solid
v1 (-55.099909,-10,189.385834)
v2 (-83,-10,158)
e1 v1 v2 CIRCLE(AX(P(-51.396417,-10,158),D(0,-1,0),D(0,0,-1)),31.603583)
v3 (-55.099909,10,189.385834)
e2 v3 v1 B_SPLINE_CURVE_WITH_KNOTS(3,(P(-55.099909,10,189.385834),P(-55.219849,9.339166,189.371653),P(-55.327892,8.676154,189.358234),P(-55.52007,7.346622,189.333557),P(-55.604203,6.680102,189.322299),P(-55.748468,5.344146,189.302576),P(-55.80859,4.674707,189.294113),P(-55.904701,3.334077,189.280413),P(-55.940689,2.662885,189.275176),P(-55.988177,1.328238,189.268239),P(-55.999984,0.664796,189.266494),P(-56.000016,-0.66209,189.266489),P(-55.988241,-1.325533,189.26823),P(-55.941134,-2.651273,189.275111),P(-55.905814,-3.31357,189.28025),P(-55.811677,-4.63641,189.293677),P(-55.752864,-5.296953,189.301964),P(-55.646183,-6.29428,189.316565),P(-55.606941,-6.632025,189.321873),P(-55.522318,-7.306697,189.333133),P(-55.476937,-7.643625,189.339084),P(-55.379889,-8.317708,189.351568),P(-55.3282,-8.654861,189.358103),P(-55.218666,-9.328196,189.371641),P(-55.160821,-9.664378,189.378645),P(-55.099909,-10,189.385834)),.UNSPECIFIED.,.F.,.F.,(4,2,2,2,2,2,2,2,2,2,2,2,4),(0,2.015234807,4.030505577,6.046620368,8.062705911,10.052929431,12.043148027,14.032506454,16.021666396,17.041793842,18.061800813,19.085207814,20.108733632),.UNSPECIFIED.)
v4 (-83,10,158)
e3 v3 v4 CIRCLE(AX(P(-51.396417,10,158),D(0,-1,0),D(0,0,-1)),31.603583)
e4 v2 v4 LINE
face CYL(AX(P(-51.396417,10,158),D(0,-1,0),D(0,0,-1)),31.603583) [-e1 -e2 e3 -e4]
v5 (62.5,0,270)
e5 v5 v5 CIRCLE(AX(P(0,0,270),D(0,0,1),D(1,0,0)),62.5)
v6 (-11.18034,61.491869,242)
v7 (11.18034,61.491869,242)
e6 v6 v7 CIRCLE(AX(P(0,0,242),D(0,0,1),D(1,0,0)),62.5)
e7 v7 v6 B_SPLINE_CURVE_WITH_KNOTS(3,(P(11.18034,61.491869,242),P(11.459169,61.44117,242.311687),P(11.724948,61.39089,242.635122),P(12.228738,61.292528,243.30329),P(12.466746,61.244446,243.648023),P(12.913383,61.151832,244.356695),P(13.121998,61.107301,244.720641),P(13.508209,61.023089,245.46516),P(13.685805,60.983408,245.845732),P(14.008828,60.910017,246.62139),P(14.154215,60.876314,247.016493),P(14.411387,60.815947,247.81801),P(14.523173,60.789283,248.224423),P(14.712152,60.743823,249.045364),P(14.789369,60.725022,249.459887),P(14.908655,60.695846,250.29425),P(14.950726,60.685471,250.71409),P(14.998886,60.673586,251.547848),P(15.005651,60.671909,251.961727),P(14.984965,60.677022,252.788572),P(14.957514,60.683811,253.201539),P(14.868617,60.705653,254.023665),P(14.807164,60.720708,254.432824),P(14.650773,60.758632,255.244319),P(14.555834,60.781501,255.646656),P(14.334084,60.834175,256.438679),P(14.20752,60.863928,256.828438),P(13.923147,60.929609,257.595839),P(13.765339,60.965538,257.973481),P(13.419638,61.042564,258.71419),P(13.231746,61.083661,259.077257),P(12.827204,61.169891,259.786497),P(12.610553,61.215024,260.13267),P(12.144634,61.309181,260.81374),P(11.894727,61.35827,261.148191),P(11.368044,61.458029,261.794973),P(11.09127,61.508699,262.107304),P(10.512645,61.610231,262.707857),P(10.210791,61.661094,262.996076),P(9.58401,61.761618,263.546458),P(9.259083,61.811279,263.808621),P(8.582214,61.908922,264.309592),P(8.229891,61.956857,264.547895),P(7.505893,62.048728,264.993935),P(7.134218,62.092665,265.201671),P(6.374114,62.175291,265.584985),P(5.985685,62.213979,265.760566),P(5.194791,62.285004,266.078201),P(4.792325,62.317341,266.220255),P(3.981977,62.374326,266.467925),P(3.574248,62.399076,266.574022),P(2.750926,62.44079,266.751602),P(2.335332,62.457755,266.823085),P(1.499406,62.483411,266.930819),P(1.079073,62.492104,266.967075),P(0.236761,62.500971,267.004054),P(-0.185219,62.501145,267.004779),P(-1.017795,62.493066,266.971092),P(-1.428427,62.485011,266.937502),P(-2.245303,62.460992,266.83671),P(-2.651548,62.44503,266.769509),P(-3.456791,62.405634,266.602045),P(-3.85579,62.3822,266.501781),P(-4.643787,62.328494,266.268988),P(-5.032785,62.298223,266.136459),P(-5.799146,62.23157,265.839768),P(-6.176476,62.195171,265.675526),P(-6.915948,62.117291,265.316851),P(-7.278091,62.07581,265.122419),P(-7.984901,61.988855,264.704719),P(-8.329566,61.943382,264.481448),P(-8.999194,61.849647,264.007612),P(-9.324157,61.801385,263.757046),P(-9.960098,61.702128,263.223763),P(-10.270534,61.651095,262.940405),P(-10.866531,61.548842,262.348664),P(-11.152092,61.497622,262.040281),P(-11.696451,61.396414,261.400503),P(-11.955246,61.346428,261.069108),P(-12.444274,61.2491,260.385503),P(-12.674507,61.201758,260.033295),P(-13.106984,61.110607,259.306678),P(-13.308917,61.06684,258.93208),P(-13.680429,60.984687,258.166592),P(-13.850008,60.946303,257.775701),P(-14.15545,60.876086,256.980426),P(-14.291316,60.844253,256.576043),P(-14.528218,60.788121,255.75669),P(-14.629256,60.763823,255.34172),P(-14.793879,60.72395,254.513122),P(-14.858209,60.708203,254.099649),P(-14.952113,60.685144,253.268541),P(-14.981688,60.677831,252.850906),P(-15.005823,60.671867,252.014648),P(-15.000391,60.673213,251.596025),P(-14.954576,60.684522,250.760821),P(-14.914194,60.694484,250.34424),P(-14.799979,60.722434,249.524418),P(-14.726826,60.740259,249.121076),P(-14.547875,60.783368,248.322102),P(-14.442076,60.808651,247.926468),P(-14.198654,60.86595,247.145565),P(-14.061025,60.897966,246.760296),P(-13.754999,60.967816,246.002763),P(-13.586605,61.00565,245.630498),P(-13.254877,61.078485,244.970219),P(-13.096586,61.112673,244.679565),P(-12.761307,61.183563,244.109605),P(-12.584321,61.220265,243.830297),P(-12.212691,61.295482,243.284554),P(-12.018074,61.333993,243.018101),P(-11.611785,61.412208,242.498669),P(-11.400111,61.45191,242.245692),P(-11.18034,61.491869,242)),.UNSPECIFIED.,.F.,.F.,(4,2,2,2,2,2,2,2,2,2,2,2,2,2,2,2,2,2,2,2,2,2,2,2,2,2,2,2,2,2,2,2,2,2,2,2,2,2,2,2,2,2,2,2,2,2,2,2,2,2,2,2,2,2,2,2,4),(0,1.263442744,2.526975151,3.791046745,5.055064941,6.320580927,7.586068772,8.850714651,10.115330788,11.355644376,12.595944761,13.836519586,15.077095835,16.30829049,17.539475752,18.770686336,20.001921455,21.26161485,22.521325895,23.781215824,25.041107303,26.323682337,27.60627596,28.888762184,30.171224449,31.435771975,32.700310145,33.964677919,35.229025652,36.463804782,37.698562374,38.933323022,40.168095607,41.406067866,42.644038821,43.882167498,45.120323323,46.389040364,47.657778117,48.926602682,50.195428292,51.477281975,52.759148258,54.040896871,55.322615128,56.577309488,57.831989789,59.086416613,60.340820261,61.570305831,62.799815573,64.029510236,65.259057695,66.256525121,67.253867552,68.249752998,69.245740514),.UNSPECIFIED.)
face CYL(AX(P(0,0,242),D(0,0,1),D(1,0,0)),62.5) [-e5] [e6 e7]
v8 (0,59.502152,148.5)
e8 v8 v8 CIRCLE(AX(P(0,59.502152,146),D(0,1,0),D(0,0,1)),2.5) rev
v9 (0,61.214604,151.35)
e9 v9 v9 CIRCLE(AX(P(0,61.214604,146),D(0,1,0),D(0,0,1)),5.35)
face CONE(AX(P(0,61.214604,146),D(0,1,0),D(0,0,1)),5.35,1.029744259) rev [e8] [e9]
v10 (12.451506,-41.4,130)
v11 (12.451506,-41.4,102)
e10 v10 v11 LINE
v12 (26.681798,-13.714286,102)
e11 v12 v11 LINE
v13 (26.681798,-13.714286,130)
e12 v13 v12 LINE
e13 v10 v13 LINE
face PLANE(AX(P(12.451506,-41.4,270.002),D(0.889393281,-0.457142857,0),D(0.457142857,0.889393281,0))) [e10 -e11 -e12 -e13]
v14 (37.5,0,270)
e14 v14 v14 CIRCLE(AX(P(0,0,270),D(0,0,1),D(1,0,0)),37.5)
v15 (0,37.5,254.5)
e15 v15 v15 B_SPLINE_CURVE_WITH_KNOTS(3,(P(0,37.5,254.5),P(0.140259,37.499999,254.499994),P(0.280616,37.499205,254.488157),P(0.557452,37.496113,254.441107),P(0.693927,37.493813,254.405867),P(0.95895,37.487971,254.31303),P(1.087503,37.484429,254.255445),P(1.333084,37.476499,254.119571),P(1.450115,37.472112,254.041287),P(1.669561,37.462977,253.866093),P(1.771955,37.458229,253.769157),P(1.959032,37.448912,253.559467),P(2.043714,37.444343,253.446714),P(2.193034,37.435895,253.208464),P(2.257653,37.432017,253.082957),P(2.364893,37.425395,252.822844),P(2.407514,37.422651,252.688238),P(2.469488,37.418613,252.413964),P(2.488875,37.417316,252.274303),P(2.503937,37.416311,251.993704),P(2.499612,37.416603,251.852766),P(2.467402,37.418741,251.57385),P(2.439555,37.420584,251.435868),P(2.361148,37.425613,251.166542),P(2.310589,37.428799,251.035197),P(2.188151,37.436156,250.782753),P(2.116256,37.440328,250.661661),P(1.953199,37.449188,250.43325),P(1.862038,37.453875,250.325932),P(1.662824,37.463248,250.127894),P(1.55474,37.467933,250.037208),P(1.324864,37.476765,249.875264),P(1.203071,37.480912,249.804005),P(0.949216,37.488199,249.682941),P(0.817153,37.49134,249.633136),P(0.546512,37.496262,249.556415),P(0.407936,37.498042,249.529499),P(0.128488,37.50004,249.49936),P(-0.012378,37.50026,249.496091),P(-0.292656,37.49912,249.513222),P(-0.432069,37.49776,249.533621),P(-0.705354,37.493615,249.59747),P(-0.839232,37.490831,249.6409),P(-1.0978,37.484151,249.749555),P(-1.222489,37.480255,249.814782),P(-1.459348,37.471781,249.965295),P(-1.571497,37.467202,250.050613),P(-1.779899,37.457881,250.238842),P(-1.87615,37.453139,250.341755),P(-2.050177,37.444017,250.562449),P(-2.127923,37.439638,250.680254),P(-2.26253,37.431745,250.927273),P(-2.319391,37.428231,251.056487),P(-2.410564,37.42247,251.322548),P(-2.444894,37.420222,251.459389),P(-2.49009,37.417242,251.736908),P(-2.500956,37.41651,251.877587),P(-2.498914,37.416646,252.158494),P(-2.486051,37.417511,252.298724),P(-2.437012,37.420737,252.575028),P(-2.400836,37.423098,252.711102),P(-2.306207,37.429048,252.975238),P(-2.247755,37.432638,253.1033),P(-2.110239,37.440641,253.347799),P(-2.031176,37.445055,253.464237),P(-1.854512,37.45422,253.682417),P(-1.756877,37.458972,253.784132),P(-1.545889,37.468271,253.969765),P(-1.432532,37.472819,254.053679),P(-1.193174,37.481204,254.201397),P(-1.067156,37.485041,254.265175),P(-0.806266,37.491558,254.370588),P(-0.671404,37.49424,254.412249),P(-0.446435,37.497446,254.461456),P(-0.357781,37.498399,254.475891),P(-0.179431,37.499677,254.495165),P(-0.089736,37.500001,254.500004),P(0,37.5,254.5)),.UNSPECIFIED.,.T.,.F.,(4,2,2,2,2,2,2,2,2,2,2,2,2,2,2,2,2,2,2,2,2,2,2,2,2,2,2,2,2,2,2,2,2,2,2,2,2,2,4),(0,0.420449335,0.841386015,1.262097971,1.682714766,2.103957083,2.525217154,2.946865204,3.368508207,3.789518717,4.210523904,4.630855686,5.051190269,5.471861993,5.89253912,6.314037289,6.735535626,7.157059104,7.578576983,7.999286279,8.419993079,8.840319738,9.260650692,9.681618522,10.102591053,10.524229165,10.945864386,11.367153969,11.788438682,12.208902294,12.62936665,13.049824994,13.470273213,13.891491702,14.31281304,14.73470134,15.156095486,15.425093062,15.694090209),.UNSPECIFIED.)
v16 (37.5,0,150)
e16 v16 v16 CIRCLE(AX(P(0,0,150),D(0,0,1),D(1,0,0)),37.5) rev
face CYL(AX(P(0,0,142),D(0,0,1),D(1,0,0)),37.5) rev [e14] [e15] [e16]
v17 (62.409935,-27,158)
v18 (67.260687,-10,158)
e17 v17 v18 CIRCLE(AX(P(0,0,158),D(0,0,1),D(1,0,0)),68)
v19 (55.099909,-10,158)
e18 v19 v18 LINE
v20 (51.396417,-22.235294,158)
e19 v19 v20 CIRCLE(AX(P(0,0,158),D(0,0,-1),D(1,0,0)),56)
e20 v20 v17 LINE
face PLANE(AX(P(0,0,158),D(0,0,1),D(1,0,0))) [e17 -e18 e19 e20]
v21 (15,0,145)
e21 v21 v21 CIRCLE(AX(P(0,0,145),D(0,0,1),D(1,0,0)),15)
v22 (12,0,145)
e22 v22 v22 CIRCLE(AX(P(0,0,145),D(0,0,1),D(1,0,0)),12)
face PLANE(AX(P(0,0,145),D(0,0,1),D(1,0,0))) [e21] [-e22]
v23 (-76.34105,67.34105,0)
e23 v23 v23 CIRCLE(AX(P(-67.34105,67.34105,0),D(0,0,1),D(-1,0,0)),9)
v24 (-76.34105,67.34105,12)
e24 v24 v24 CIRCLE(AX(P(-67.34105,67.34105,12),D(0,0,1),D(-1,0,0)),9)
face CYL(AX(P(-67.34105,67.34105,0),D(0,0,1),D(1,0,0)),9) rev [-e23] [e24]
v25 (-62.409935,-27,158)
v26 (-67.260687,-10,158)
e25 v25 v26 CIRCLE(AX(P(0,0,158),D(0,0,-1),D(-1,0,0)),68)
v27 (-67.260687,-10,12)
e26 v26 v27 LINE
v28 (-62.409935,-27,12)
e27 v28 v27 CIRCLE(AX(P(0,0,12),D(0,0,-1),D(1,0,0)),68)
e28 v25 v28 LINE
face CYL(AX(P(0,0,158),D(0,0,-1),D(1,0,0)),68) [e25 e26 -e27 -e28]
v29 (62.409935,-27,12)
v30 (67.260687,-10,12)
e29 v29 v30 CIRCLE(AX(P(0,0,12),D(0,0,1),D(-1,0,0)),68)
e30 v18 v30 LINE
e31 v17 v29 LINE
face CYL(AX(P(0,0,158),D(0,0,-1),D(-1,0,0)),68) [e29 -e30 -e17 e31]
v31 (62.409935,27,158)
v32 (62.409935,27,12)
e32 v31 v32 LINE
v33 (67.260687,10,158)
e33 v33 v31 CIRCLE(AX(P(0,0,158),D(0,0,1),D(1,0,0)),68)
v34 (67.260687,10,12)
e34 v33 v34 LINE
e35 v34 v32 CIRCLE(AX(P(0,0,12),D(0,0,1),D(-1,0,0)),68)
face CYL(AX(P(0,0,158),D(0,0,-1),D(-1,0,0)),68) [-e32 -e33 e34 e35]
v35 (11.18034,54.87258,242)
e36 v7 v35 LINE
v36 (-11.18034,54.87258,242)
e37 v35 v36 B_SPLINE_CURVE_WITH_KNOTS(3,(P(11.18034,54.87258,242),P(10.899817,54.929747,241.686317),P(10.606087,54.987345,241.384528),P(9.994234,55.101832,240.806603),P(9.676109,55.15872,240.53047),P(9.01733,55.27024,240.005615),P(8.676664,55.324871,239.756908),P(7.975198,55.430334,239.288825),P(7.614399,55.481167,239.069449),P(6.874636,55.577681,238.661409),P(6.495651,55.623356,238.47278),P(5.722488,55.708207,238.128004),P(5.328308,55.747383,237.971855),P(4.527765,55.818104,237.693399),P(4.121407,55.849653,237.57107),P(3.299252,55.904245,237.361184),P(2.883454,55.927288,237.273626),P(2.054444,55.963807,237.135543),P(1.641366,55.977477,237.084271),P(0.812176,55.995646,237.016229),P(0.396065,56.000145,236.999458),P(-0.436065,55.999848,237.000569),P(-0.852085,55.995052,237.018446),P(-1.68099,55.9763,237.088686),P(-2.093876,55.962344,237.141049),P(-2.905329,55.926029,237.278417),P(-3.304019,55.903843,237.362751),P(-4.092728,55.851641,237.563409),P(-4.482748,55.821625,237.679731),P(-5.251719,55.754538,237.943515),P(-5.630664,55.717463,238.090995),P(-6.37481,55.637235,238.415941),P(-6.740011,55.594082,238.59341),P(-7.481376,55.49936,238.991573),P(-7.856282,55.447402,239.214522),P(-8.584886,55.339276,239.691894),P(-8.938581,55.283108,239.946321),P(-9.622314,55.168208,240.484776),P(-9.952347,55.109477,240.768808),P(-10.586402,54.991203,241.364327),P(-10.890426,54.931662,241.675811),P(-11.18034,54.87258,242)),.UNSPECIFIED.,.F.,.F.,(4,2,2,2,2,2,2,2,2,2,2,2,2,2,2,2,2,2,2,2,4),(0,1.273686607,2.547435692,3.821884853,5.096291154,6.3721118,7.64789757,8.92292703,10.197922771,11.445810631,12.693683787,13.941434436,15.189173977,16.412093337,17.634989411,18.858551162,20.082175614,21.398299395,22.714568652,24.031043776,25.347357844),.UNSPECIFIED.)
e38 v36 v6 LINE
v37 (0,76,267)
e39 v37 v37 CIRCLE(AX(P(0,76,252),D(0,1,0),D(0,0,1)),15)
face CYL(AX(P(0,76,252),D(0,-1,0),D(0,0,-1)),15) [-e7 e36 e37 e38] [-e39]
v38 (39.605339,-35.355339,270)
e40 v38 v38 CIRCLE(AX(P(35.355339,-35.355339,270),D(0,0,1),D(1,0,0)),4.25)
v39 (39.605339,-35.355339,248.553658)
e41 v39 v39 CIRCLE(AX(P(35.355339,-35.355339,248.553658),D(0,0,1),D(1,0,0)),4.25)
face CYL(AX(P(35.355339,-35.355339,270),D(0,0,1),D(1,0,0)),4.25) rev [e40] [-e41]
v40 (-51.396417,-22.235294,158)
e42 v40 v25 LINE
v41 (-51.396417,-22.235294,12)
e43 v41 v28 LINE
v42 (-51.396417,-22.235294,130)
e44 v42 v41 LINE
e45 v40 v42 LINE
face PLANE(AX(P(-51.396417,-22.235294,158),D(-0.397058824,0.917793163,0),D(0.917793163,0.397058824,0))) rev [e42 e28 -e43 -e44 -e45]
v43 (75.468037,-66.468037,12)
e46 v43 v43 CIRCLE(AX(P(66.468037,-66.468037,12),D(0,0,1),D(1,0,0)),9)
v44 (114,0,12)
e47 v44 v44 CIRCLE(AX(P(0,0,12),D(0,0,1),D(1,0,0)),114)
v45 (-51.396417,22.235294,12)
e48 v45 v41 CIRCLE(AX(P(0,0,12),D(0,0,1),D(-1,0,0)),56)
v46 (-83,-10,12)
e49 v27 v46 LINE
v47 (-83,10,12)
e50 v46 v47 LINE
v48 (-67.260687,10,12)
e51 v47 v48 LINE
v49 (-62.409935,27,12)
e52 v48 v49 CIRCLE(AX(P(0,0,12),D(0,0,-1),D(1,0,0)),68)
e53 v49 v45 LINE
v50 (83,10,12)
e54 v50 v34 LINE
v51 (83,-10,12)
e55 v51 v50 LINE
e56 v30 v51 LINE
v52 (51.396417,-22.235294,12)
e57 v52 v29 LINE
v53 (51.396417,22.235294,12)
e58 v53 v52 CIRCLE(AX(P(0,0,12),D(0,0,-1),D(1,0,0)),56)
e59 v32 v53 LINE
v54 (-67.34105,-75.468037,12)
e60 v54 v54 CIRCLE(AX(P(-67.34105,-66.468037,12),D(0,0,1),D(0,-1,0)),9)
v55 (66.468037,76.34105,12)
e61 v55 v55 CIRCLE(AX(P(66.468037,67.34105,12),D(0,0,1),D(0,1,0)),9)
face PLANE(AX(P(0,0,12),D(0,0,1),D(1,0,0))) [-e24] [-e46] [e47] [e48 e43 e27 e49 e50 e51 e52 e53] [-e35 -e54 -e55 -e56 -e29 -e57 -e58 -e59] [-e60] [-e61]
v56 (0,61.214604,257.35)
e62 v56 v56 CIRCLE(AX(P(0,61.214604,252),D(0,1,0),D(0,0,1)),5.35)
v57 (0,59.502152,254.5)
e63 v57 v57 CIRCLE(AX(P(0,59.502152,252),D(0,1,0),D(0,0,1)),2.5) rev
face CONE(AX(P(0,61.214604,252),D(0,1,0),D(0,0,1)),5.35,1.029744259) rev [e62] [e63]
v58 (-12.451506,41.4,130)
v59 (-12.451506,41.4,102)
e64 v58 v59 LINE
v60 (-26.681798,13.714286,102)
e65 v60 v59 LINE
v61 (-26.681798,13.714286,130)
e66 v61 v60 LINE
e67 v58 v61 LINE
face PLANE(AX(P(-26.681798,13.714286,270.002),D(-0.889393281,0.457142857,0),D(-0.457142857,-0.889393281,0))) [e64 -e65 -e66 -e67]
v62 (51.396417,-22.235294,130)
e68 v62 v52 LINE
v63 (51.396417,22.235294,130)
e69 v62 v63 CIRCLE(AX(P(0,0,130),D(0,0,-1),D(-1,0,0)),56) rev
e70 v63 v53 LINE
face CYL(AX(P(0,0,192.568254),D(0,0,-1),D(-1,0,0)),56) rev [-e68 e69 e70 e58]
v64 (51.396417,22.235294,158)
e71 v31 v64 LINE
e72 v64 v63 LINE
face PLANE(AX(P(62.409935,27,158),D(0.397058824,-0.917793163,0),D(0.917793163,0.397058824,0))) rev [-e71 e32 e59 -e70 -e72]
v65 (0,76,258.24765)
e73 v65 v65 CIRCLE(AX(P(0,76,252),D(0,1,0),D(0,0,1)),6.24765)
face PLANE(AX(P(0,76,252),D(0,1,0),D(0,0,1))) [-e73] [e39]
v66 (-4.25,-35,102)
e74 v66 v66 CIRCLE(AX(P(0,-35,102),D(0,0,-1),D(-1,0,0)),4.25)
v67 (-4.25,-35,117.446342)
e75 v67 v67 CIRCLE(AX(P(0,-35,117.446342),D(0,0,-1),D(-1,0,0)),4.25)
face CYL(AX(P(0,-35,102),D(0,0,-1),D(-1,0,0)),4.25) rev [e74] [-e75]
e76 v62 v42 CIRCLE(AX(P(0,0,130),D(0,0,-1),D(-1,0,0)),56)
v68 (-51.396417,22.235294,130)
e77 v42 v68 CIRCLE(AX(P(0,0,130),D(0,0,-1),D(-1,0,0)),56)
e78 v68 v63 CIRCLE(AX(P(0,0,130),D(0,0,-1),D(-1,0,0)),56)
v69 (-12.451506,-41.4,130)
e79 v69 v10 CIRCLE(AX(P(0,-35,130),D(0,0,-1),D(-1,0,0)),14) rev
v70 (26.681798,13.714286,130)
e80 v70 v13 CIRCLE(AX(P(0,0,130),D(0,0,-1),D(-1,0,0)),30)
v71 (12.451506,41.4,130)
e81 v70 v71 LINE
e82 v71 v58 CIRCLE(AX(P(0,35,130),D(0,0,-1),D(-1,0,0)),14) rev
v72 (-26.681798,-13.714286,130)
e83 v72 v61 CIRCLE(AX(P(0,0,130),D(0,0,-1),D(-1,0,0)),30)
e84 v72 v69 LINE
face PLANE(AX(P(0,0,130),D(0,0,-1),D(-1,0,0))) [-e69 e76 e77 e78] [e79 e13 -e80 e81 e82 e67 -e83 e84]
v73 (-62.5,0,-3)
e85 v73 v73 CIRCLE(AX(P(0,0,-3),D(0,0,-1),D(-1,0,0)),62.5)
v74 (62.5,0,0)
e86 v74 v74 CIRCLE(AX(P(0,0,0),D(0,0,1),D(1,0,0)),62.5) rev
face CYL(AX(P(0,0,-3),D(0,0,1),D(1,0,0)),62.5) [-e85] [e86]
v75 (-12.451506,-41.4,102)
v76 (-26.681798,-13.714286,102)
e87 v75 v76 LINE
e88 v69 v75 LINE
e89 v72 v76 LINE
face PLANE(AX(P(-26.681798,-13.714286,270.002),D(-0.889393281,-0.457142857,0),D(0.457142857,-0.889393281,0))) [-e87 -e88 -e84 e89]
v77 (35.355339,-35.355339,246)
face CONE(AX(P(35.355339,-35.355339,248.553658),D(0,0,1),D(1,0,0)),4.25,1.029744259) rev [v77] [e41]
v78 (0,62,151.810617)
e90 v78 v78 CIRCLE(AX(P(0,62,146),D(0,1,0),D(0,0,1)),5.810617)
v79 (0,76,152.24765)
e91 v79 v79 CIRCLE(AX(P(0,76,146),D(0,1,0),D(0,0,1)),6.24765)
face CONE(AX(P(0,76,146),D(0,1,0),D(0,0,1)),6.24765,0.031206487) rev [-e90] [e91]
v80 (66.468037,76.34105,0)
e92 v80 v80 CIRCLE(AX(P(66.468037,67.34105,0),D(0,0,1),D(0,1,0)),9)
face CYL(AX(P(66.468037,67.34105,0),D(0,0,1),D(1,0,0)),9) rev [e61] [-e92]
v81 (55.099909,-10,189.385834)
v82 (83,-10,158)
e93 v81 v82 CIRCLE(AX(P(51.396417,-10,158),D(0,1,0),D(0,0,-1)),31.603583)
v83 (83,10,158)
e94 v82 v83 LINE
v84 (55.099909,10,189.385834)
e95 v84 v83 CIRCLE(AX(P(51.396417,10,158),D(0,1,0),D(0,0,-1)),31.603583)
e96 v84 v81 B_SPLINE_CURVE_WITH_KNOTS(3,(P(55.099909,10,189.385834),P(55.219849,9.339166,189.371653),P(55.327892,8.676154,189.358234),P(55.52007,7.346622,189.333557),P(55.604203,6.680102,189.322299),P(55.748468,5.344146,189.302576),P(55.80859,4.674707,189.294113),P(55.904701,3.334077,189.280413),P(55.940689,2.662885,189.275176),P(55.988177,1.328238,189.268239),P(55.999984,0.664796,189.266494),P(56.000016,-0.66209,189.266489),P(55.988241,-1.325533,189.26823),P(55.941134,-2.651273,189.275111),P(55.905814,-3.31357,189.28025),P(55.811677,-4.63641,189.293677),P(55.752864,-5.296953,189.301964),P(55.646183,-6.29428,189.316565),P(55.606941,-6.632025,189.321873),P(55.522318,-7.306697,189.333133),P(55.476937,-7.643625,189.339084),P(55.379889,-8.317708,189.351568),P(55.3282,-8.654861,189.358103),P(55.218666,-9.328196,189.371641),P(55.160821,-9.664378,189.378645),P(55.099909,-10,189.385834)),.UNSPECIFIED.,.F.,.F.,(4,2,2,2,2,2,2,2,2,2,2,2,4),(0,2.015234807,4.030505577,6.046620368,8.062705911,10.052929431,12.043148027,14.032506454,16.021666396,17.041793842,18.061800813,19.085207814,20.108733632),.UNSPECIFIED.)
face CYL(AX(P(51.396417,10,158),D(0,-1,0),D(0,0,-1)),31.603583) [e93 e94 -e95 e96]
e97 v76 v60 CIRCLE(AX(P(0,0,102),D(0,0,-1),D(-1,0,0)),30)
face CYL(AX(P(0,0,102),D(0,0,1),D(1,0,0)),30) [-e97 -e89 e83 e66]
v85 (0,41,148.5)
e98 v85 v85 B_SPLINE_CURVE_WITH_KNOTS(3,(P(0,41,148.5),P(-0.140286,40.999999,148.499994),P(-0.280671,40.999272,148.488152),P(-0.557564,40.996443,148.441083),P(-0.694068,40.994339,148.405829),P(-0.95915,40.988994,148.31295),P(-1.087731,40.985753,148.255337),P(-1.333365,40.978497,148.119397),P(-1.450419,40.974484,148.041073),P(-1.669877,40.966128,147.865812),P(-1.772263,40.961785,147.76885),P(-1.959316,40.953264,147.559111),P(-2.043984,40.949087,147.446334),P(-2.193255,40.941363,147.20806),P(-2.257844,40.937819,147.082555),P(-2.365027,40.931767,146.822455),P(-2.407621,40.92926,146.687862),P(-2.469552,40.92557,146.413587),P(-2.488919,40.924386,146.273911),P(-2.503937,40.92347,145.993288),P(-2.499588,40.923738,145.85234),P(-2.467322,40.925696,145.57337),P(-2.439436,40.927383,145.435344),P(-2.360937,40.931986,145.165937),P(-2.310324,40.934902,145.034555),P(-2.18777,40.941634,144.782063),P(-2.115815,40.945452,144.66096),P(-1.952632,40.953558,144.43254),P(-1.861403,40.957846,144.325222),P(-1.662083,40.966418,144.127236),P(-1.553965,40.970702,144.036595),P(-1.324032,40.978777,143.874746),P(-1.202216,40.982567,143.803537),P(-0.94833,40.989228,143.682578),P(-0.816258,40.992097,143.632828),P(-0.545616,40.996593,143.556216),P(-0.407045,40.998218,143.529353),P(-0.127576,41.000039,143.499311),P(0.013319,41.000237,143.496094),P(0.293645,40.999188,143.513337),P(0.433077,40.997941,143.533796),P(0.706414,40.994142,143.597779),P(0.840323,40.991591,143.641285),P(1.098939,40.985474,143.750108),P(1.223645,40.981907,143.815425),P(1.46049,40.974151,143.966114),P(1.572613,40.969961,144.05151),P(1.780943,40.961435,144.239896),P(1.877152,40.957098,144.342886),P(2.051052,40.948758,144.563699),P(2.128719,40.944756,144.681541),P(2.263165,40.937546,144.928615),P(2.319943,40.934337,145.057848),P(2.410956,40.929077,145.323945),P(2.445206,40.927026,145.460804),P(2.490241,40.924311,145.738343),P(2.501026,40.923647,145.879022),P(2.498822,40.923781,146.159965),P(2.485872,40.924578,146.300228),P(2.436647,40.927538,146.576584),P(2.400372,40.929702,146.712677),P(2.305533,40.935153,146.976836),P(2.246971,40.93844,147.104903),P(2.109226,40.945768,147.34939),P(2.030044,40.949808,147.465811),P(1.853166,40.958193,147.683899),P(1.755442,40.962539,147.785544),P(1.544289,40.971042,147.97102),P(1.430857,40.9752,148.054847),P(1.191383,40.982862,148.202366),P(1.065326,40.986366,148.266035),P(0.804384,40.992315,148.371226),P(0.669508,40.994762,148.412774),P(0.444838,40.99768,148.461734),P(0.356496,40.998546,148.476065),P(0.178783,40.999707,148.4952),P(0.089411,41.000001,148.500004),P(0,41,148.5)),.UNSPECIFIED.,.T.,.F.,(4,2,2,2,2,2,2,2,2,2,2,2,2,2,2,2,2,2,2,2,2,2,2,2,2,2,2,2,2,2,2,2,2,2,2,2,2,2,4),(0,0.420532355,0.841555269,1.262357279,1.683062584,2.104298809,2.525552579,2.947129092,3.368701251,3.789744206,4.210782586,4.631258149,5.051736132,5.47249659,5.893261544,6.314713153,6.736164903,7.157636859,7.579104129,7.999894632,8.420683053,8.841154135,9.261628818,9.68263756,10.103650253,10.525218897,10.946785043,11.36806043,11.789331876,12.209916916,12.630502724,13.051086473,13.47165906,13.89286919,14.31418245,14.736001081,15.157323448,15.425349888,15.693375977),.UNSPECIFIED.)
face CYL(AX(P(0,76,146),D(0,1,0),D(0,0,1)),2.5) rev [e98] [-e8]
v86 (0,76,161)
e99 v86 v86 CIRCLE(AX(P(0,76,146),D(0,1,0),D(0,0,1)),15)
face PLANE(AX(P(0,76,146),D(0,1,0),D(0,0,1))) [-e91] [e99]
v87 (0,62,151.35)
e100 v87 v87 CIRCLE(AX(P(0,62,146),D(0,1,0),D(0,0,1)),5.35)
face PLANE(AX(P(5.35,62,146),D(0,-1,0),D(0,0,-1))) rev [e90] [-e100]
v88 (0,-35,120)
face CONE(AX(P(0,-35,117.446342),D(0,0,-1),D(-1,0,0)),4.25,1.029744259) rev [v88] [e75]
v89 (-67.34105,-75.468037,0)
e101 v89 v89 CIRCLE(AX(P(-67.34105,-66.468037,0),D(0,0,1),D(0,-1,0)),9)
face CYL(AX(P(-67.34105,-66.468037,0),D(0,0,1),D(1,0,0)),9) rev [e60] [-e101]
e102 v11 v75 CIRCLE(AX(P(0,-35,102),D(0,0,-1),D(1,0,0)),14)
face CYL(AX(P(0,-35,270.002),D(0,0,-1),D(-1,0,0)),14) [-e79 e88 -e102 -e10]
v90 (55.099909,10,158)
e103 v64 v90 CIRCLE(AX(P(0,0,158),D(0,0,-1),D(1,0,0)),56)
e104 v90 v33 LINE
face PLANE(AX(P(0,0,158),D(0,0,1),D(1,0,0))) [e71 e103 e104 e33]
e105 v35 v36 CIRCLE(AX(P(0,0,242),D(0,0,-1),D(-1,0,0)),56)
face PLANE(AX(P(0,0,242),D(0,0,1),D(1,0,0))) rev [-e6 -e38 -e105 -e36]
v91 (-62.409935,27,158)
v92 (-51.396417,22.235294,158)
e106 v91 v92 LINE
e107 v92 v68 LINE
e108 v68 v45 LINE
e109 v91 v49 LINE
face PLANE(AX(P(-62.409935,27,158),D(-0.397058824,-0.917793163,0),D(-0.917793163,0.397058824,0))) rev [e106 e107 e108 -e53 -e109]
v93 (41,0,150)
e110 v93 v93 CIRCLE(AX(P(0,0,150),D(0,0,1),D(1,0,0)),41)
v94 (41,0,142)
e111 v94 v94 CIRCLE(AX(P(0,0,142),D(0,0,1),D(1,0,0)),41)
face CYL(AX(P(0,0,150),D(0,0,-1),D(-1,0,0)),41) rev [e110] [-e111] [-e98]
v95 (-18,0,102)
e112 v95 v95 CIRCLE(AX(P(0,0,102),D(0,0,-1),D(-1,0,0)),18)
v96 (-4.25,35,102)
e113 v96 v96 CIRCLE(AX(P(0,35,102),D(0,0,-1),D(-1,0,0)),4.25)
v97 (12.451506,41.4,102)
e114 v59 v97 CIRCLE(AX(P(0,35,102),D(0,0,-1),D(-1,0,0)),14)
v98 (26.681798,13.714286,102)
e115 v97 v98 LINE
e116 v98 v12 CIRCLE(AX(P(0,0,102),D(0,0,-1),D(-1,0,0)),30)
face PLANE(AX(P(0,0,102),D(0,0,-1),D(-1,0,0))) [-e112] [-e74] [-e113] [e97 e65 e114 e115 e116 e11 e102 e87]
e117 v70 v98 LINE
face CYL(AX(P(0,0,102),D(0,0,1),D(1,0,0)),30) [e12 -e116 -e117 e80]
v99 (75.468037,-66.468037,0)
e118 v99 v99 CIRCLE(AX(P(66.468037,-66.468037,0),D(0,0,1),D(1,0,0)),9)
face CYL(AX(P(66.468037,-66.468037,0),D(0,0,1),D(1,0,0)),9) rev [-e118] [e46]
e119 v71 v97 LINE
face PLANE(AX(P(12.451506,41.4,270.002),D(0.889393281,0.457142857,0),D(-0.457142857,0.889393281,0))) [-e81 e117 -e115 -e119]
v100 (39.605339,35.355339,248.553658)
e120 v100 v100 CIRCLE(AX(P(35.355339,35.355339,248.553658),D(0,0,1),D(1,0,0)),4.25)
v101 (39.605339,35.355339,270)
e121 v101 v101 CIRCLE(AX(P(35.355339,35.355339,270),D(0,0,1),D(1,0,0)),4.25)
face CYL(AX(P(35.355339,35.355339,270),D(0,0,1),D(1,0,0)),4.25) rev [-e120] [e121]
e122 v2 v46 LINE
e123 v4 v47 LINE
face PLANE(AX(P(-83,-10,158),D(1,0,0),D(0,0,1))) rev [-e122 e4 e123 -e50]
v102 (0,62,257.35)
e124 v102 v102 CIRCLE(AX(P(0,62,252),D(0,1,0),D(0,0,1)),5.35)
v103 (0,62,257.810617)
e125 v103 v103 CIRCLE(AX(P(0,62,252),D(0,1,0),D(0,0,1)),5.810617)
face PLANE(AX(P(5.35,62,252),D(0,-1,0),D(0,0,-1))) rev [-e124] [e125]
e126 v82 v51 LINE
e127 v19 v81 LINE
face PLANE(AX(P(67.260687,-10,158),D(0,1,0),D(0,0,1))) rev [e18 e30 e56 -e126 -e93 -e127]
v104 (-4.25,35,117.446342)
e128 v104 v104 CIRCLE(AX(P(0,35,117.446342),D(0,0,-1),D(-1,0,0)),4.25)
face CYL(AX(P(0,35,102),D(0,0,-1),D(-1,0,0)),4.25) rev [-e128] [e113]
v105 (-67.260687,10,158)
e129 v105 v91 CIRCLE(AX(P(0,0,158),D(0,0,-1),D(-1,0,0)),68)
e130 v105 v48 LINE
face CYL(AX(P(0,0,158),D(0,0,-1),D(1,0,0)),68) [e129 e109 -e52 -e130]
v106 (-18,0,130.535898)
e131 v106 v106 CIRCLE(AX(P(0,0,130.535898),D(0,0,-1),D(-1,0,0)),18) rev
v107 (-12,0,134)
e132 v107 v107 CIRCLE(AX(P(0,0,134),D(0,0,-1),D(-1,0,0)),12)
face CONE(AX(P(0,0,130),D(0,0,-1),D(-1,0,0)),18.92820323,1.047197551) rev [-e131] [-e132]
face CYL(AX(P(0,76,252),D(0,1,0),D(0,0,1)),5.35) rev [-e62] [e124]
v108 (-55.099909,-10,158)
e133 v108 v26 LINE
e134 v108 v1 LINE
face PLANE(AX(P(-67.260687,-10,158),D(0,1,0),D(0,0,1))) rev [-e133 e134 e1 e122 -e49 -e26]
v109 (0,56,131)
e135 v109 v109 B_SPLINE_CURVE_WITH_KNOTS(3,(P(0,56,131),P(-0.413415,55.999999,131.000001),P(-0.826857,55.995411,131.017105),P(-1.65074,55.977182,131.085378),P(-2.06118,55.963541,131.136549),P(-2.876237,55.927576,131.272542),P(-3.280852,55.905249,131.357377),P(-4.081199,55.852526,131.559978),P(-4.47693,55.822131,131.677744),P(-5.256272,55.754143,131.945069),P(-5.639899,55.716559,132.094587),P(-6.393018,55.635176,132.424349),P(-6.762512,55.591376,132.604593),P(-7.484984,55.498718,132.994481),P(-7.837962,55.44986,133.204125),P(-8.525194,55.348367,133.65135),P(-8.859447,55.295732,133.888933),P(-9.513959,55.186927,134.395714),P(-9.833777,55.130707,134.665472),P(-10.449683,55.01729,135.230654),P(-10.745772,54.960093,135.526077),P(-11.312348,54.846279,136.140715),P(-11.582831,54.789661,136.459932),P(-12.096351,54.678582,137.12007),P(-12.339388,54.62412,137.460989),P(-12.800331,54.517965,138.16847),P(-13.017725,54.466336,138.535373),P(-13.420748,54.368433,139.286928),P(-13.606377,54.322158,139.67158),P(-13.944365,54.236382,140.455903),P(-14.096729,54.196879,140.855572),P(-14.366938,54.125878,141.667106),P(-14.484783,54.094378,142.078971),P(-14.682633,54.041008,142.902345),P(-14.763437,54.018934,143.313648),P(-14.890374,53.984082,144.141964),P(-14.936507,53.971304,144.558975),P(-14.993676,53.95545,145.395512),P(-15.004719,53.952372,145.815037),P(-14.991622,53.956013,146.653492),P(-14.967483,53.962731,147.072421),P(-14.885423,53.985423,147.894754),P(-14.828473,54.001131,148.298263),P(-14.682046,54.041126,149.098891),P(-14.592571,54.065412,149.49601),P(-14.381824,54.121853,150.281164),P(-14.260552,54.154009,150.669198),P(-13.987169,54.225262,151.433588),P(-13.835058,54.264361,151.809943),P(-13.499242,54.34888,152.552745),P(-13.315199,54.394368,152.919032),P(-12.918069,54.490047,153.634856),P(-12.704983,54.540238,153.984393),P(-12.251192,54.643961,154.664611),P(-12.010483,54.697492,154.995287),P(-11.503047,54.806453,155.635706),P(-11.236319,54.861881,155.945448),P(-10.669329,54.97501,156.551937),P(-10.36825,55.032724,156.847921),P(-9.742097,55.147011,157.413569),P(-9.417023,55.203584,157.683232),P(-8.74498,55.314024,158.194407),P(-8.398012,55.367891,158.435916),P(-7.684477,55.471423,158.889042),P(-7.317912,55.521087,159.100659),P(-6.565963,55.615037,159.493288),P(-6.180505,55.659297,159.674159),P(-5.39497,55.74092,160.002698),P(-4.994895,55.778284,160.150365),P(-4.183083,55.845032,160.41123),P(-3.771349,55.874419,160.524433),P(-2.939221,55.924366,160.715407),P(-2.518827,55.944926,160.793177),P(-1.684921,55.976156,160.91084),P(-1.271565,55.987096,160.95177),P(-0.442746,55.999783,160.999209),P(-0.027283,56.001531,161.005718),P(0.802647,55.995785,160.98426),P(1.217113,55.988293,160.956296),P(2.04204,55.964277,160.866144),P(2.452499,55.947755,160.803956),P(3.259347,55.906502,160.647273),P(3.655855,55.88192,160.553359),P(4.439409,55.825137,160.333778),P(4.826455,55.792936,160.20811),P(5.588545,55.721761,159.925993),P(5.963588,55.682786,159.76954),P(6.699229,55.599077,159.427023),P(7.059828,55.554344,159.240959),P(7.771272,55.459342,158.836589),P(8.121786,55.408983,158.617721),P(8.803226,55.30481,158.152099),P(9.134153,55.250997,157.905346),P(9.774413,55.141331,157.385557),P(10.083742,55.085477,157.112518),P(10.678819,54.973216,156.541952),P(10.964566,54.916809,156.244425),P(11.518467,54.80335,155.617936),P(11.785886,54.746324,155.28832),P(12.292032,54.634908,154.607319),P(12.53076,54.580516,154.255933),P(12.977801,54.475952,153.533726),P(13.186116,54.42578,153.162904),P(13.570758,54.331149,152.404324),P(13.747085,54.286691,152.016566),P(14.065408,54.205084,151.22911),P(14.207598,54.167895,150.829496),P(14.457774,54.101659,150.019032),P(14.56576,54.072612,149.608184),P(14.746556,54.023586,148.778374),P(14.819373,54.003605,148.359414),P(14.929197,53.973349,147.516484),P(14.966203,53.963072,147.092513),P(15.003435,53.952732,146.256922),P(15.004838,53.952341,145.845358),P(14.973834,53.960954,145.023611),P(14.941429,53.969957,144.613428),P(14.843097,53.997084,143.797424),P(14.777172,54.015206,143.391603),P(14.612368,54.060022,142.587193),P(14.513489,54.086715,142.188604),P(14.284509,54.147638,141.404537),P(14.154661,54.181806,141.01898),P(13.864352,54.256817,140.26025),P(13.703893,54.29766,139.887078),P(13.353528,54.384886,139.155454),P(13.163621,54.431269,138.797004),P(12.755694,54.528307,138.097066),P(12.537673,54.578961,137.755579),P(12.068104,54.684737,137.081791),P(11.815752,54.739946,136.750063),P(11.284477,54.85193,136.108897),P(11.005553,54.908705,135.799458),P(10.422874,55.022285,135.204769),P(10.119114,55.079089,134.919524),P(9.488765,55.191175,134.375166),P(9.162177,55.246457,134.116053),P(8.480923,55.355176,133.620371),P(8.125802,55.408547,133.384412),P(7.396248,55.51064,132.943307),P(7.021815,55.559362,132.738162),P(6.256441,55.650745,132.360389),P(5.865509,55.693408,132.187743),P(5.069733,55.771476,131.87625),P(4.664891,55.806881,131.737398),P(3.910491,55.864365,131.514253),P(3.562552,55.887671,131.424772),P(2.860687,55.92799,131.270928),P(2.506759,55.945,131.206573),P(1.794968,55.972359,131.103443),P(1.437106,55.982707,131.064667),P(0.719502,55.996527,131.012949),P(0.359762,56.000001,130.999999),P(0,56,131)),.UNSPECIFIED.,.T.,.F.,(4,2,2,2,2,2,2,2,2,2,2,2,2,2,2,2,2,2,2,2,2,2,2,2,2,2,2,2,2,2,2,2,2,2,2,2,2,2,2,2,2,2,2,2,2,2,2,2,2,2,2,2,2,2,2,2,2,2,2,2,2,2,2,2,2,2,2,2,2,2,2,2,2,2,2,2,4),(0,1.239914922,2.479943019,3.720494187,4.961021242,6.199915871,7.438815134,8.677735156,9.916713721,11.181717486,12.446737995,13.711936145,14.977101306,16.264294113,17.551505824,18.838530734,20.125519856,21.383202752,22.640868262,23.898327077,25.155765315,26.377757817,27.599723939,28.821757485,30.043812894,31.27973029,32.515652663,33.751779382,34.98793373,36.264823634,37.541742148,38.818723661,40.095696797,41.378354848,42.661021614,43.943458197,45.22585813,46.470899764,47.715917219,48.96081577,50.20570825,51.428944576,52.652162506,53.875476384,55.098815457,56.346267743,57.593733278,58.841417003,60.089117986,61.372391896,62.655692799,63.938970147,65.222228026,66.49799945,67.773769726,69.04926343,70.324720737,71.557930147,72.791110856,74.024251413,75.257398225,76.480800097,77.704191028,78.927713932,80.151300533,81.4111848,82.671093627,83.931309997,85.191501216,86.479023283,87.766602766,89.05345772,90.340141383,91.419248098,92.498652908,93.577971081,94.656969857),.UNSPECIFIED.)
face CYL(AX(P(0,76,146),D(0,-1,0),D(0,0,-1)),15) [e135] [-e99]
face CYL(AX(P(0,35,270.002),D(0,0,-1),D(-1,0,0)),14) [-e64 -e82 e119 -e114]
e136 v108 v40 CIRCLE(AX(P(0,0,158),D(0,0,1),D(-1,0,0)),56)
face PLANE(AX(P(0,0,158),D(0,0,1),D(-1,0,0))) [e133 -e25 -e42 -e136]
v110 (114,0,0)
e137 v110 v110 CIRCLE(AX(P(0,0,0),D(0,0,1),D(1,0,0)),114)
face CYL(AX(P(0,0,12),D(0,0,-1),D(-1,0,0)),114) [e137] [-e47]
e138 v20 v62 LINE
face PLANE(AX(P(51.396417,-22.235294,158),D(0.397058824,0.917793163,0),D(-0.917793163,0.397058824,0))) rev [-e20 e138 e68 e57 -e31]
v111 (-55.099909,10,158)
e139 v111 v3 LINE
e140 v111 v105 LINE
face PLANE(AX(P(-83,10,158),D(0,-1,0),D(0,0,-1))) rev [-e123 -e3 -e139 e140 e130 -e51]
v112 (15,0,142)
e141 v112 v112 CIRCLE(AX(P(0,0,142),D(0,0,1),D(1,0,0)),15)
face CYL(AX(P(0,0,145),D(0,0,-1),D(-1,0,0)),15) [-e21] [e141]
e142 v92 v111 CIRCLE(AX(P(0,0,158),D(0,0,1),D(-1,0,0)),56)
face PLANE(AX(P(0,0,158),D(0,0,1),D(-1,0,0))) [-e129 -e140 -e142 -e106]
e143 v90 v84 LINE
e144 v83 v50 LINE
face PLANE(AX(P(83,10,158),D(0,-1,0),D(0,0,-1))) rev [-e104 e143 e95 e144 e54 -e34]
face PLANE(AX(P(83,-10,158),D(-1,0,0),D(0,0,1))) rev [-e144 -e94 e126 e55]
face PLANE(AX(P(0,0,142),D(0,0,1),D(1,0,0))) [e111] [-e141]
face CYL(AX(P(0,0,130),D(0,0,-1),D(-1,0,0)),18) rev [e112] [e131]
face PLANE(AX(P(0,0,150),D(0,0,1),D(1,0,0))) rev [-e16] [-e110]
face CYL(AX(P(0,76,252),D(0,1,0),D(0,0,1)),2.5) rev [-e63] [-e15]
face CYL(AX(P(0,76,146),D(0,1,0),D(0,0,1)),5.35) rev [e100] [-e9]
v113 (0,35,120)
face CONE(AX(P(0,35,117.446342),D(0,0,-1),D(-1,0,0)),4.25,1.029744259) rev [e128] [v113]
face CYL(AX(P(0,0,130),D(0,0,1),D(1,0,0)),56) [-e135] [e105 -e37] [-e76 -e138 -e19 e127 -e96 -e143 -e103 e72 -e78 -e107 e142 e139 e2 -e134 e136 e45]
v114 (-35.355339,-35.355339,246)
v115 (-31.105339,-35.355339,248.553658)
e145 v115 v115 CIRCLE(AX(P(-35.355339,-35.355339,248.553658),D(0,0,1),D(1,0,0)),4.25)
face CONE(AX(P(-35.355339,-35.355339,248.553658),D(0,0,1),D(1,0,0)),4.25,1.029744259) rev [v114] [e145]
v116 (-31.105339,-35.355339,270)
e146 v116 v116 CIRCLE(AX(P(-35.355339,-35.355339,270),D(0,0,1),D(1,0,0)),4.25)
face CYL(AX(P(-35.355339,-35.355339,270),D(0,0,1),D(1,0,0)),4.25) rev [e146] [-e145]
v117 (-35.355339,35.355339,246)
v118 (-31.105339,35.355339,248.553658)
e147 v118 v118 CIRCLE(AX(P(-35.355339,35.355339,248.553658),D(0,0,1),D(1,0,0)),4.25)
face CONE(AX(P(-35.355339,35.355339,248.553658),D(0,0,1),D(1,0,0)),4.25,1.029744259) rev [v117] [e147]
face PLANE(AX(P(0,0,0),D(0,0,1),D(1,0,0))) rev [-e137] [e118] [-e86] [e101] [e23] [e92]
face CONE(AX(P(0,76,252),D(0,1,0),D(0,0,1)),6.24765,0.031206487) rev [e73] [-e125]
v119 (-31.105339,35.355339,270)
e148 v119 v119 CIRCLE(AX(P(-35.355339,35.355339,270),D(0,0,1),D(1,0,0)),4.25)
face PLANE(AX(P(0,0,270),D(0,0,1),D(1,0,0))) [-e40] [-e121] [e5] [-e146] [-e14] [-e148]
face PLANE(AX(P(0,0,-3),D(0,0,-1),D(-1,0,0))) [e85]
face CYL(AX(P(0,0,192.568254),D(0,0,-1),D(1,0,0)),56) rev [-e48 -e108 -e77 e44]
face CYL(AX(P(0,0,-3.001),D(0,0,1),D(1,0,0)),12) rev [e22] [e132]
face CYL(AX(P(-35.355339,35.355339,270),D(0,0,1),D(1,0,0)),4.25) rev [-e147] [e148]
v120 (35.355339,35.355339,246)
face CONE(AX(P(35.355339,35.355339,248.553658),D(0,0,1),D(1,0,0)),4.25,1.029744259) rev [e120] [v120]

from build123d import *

# Parameters (mm, degrees)
SKETCH_1_R               = 114
EXTRUDE_1_DEPTH          = 12
EXTRUDE_START            = 258
SKETCH_2_R               = 62.5
EXTRUDE_2_DEPTH          = 28
SKETCH_3_R               = 56
EXTRUDE_3_DEPTH          = 112
SKETCH_4_R               = 30
EXTRUDE_4_DEPTH          = 28
EXTRUDE_5_REACH          = 234.843
EXTRUDE_6_DEPTH          = 118
EXTRUDE_18_DEPTH         = 28
EXTRUDE_19_DEPTH         = 10
SKETCH_12_R              = 15
EXTRUDE_20_DEPTH         = 76
SKETCH_13_R              = 15
EXTRUDE_21_DEPTH         = 76
SKETCH_14_R              = 9
CUT_EXTRUDE_1_DEPTH      = 305.230176103
PATTERN_CIRCULAR_1_COUNT = 4
SKETCH_15_R              = 62.5
EXTRUDE_22_DEPTH         = 3
SKETCH_16_R              = 37.5
CUT_EXTRUDE_2_DEPTH      = 128
PATTERN_CIRCULAR_2_COUNT = 4
SKETCH_19_R              = 41
CUT_EXTRUDE_3_DEPTH      = 8
SKETCH_20_R              = 15
EXTRUDE_23_DEPTH         = 3
CUT_EXTRUDE_4_REACH      = 220.852
SKETCH_21_R              = 12
SKETCH_22_R              = 18
CUT_EXTRUDE_5_DEPTH      = 28
CHAMFER_1_SIZE           = 6.92820323
CHAMFER_1_SIZE_2         = 4
F_1_4_RC_1_AT_2_COUNT    = 2
F_1_4_RC_1_AT_2_PITCH    = 106
F_5_0MM_START            = 11.779218889
F_5_0MM_1_OUTLINE_R      = 2.5
F_5_0MM_1_DEPTH          = 47.722932759
SKETCH_26_R              = 15
SKETCH_26_R_2            = 12
EXTRUDE_24_DEPTH         = 3


# Read off the part's stored shape, not the designer's step: Ø5.0mm 暗销孔1, M10 螺纹孔2
with BuildPart() as part:
    # 草图1 → 凸台-拉伸1 (new body)
    with BuildSketch(Plane.XY):
        Circle(SKETCH_1_R)
    extrude(amount=EXTRUDE_1_DEPTH)

    # 草图6 → 凸台-拉伸6 (add)
    with BuildSketch(Plane.XY.offset(12)):
        with BuildLine():
            Line((51.396417147, 22.235294118), (62.409935107, 27))
            ThreePointArc((62.409935107, 27), (65.390118151, 18.658307753), (67.260686883, 10))
            Line((67.260686883, 10), (83, 10))
            Line((83, 10), (83, -10))
            Line((83, -10), (67.260686883, -10))
            ThreePointArc((67.260686883, -10), (65.390118151, -18.658307753), (62.409935107, -27))
            Line((62.409935107, -27), (51.396417147, -22.235294118))
            ThreePointArc((51.396417147, -22.235294118), (56, 0), (51.396417147, 22.235294118))
        make_face()
    extrude_6 = extrude(amount=EXTRUDE_6_DEPTH)



with BuildPart() as body_2:
    # 草图2 → 凸台-拉伸2 (new body)
    with BuildSketch(Plane.XY.offset(12).offset(EXTRUDE_START)):
        Circle(SKETCH_2_R)
    extrude(amount=-EXTRUDE_2_DEPTH)

    # 草图3 → 凸台-拉伸3 (add)
    with BuildSketch(Plane(origin=(0, 0, 242), x_dir=(-1, 0, 0), z_dir=(0, 0, -1))):
        Circle(SKETCH_3_R)
    extrude(amount=EXTRUDE_3_DEPTH)

    # 草图4 → 凸台-拉伸4 (add)
    with BuildSketch(Plane(origin=(0, 0, 130), x_dir=(-1, 0, 0), z_dir=(0, 0, -1))):
        Circle(SKETCH_4_R)
    extrude(amount=EXTRUDE_4_DEPTH)

    # 草图5 → 凸台-拉伸5 (add, up to next)
    with BuildSketch(Plane(origin=(0, 0, 102), x_dir=(-1, 0, 0), z_dir=(0, 0, -1)), mode=Mode.PRIVATE) as extrude_5_sk1:
        with BuildLine():
            ThreePointArc((-26.681798428, 13.714285714), (0, 30), (26.681798428, 13.714285714))
            Line((26.681798428, 13.714285714), (12.451505933, 41.4))
            ThreePointArc((12.451505933, 41.4), (0, 49), (-12.451505933, 41.4))
            Line((-12.451505933, 41.4), (-26.681798428, 13.714285714))
        make_face()
    extrude_5_tool1 = extrude(extrude_5_sk1.sketch, amount=-EXTRUDE_5_REACH, mode=Mode.PRIVATE) - body_2.part
    # 草图5 → 凸台-拉伸5 (add, up to next)
    with BuildSketch(Plane(origin=(0, 0, 102), x_dir=(-1, 0, 0), z_dir=(0, 0, -1)), mode=Mode.PRIVATE) as extrude_5_sk2:
        with BuildLine():
            Line((12.451505933, -41.4), (26.681798428, -13.714285714))
            ThreePointArc((26.681798428, -13.714285714), (0, -30), (-26.681798428, -13.714285714))
            Line((-26.681798428, -13.714285714), (-12.451505933, -41.4))
            ThreePointArc((-12.451505933, -41.4), (0, -49), (12.451505933, -41.4))
        make_face()
    extrude_5_tool2 = extrude(extrude_5_sk2.sketch, amount=-EXTRUDE_5_REACH, mode=Mode.PRIVATE) - body_2.part
    add(extrude_5_tool1.solids().sort_by_distance((0, 35.767419, 102))[0])
    add(extrude_5_tool2.solids().sort_by_distance((0, -35.767419, 102))[0])


with BuildPart() as part_1:
    add(part.part)

    add(body_2.part)  # 凸台-拉伸18 merges body 2
    # 草图10 → 凸台-拉伸18 (add)
    with BuildSketch(Plane.XY.offset(130)):
        with BuildLine():
            Line((51.396417147, -22.235294118), (62.409935107, -27))
            ThreePointArc((62.409935107, -27), (65.390118151, -18.658307753), (67.260686883, -10))
            Line((67.260686883, -10), (83, -10))
            Line((83, -10), (83, 10))
            Line((83, 10), (67.260686883, 10))
            ThreePointArc((67.260686883, 10), (65.390118151, 18.658307753), (62.409935107, 27))
            Line((62.409935107, 27), (51.396417147, 22.235294118))
            ThreePointArc((51.396417147, 22.235294118), (56, 0), (51.396417147, -22.235294118))
        make_face()
    extrude_18 = extrude(amount=EXTRUDE_18_DEPTH)

    # 草图11 → 凸台-拉伸19 (add, symmetric)
    with BuildSketch(Plane(origin=(0, 0, 0), x_dir=(1, 0, 0), z_dir=(0, 1, 0))):
        with BuildLine():
            Line((51.396417147, -189.603582853), (51.396417147, -158))
            Line((51.396417147, -158), (83, -158))
            ThreePointArc((83, -158), (73.743524892, -180.347107745), (51.396417147, -189.603582853))
        make_face()
    extrude_19 = extrude(amount=EXTRUDE_19_DEPTH, both=True)

    # 镜向4: 凸台-拉伸6, 凸台-拉伸18, 凸台-拉伸19 across plane
    add(extrude_6.mirror(Plane(origin=(0, 0, 0), x_dir=(0, 0, 1), z_dir=(1, 0, 0))))
    add(extrude_18.mirror(Plane(origin=(0, 0, 0), x_dir=(0, 0, 1), z_dir=(1, 0, 0))))
    add(extrude_19.mirror(Plane(origin=(0, 0, 0), x_dir=(0, 0, 1), z_dir=(1, 0, 0))))

    # 草图12 → 凸台-拉伸20 (add)
    with BuildSketch(Plane(origin=(0, 0, 0), x_dir=(1, 0, 0), z_dir=(0, 1, 0))):
        with Locations(Location((0, -252, 0), (0, 0, 138.189685104))):
            Circle(SKETCH_12_R)
    extrude(amount=EXTRUDE_20_DEPTH)

    # 草图13 → 凸台-拉伸21 (add)
    with BuildSketch(Plane(origin=(0, 0, 0), x_dir=(1, 0, 0), z_dir=(0, 1, 0))):
        with Locations(Location((0, -146, 0), (0, 0, 90))):
            Circle(SKETCH_13_R)
    extrude(amount=EXTRUDE_21_DEPTH)

    # 草图14 → 切除-拉伸1 (cut, through all)
    with BuildSketch(Plane.XY.offset(12)):
        with Locations((66.468037432, -66.468037432)):
            Circle(SKETCH_14_R)
    cut_extrude_1 = extrude(amount=-CUT_EXTRUDE_1_DEPTH, mode=Mode.SUBTRACT)

    # 阵列(圆周)1: 切除-拉伸1 ×4 about axis
    pattern_circular_1_axis = Axis((-0.436506366, 0.436506366, 0), (0, 0, 1))
    for i in range(1, PATTERN_CIRCULAR_1_COUNT):
        add(cut_extrude_1.rotate(pattern_circular_1_axis, i * 360 / PATTERN_CIRCULAR_1_COUNT), mode=Mode.SUBTRACT)

    # 草图15 → 凸台-拉伸22 (add)
    with BuildSketch(Plane(origin=(0, 0, 0), x_dir=(-1, 0, 0), z_dir=(0, 0, -1))):
        with Locations(Location((0, 0, 0), (0, 0, 180))):
            Circle(SKETCH_15_R)
    extrude(amount=EXTRUDE_22_DEPTH)

    # 草图16 → 切除-拉伸2 (cut)
    with BuildSketch(Plane.XY.offset(270)):
        Circle(SKETCH_16_R)
    extrude(amount=-CUT_EXTRUDE_2_DEPTH, mode=Mode.SUBTRACT)

    # 草图18 → M10 螺纹孔1 (revolve, cut)
    with BuildSketch(Plane(origin=(35.355339059, 35.355339059, 270), x_dir=(0, -1, 0), z_dir=(1, 0, 0))):
        Polygon((0, 0), (0, 24), (4.25, 21.446342369), (4.25, 0), align=None)
    hole_wizard_m10_1 = revolve(axis=Axis((35.355339059, 35.355339059, 276.35), (0, 0, -1)), mode=Mode.SUBTRACT)

    # 阵列(圆周)2: M10 螺纹孔1 ×4 about axis
    pattern_circular_2_axis = Axis((0, 0, 0), (0, 0, 1))
    for i in range(1, PATTERN_CIRCULAR_2_COUNT):
        add(hole_wizard_m10_1.rotate(pattern_circular_2_axis, i * 360 / PATTERN_CIRCULAR_2_COUNT), mode=Mode.SUBTRACT)

    # 草图19 → 切除-拉伸3 (cut)
    with BuildSketch(Plane.XY.offset(142)):
        Circle(SKETCH_19_R)
    extrude(amount=CUT_EXTRUDE_3_DEPTH, mode=Mode.SUBTRACT)

    # 草图20 → 凸台-拉伸23 (add)
    with BuildSketch(Plane.XY.offset(142)):
        Circle(SKETCH_20_R)
    extrude(amount=EXTRUDE_23_DEPTH)

    # 草图21 → 切除-拉伸4 (cut, up to next)
    with BuildSketch(Plane.XY.offset(145), mode=Mode.PRIVATE) as cut_extrude_4_sk1:
        Circle(SKETCH_21_R)
    cut_extrude_4_tool1 = extrude(cut_extrude_4_sk1.sketch, amount=-CUT_EXTRUDE_4_REACH, mode=Mode.PRIVATE) & part_1.part
    add(cut_extrude_4_tool1.solids().sort_by_distance((0, 0, 145))[0], mode=Mode.SUBTRACT)

    # 草图22 → 切除-拉伸5 (cut)
    with BuildSketch(Plane(origin=(0, 0, 102), x_dir=(-1, 0, 0), z_dir=(0, 0, -1))):
        Circle(SKETCH_22_R)
    extrude(amount=-CUT_EXTRUDE_5_DEPTH, mode=Mode.SUBTRACT)

    # 倒角1
    # the kernel refuses this chamfer: 6.92820323, 4 mm, written as the material it takes off along each edge
    with BuildSketch(Plane(origin=(0, 0, 130), x_dir=(1, 0, 0), z_dir=(0, -1, 0))) as chamfer_1_piece_1_section:
        Polygon((12 + CHAMFER_1_SIZE, 0), (12, CHAMFER_1_SIZE_2), (12, 0), align=None)
    chamfer_1_piece_1 = revolve(axis=Axis((0, 0, 130), (0, 0, 1)), mode=Mode.PRIVATE)
    chamfer_1_piece_1 = chamfer_1_piece_1 & Plane(origin=(0, 0, 132.241387072), x_dir=(-1, 0, 0), z_dir=(0, 0, -1)) * Cylinder(18, 76, mode=Mode.PRIVATE)
    add(chamfer_1_piece_1, mode=Mode.SUBTRACT)

    # 草图24 → 1/4 Rc 螺纹孔1 (revolve, cut)
    with BuildSketch(Plane(origin=(0, 76, 252), x_dir=(0, 0, 1), z_dir=(1, 0, 0))):
        Polygon((0, 0), (0, 18), (5.35, 14.785395688), (5.35, 14), (5.810617305, 14), (6.24765, 0), align=None)
    f_1_4_rc_1 = revolve(axis=Axis((0, 82.35, 252), (0, -1, 0)), mode=Mode.SUBTRACT)

    # 1/4 Rc 螺纹孔1 at 2: 1/4 Rc 螺纹孔1 ×2
    with Locations(*[(0, 0, -i * F_1_4_RC_1_AT_2_PITCH) for i in range(1, F_1_4_RC_1_AT_2_COUNT)]):
        add(f_1_4_rc_1, mode=Mode.SUBTRACT)

    # Ø5.0mm 暗销孔1 outline → Ø5.0mm 暗销孔1 (cut)
    with BuildSketch(Plane(origin=(0, 0, 0), x_dir=(1, 0, 0), z_dir=(0, 1, 0)).offset(F_5_0MM_START)):
        with Locations((0, -252)):
            Circle(F_5_0MM_1_OUTLINE_R)
        with BuildLine():
            ThreePointArc((-2.291287847, -145), (0, -148.5), (2.291287847, -145))
            ThreePointArc((2.291287847, -145), (0, -143.5), (-2.291287847, -145))
        make_face()
    extrude(amount=F_5_0MM_1_DEPTH, mode=Mode.SUBTRACT)

    # 草图26 → 凸台-拉伸24 (add)
    with BuildSketch(Plane.XY.offset(145)):
        Circle(SKETCH_26_R)
        Circle(SKETCH_26_R_2, mode=Mode.SUBTRACT)
    extrude(amount=-EXTRUDE_24_DEPTH)

    # M10 螺纹孔2 outline → M10 螺纹孔2 (revolve, cut)
    with BuildSketch(Plane.XZ.offset(-35)):
        Polygon((4.25, 117.446342369), (0, 120), (0, 102), (4.25, 102), align=None)
    hole_wizard_m10_2 = revolve(axis=Axis((0, 35, 0), (0, 0, 1)), mode=Mode.SUBTRACT)

    # 镜向6: M10 螺纹孔2 across plane
    add(hole_wizard_m10_2.mirror(Plane.ZX), mode=Mode.SUBTRACT)


solid = part_1.part
